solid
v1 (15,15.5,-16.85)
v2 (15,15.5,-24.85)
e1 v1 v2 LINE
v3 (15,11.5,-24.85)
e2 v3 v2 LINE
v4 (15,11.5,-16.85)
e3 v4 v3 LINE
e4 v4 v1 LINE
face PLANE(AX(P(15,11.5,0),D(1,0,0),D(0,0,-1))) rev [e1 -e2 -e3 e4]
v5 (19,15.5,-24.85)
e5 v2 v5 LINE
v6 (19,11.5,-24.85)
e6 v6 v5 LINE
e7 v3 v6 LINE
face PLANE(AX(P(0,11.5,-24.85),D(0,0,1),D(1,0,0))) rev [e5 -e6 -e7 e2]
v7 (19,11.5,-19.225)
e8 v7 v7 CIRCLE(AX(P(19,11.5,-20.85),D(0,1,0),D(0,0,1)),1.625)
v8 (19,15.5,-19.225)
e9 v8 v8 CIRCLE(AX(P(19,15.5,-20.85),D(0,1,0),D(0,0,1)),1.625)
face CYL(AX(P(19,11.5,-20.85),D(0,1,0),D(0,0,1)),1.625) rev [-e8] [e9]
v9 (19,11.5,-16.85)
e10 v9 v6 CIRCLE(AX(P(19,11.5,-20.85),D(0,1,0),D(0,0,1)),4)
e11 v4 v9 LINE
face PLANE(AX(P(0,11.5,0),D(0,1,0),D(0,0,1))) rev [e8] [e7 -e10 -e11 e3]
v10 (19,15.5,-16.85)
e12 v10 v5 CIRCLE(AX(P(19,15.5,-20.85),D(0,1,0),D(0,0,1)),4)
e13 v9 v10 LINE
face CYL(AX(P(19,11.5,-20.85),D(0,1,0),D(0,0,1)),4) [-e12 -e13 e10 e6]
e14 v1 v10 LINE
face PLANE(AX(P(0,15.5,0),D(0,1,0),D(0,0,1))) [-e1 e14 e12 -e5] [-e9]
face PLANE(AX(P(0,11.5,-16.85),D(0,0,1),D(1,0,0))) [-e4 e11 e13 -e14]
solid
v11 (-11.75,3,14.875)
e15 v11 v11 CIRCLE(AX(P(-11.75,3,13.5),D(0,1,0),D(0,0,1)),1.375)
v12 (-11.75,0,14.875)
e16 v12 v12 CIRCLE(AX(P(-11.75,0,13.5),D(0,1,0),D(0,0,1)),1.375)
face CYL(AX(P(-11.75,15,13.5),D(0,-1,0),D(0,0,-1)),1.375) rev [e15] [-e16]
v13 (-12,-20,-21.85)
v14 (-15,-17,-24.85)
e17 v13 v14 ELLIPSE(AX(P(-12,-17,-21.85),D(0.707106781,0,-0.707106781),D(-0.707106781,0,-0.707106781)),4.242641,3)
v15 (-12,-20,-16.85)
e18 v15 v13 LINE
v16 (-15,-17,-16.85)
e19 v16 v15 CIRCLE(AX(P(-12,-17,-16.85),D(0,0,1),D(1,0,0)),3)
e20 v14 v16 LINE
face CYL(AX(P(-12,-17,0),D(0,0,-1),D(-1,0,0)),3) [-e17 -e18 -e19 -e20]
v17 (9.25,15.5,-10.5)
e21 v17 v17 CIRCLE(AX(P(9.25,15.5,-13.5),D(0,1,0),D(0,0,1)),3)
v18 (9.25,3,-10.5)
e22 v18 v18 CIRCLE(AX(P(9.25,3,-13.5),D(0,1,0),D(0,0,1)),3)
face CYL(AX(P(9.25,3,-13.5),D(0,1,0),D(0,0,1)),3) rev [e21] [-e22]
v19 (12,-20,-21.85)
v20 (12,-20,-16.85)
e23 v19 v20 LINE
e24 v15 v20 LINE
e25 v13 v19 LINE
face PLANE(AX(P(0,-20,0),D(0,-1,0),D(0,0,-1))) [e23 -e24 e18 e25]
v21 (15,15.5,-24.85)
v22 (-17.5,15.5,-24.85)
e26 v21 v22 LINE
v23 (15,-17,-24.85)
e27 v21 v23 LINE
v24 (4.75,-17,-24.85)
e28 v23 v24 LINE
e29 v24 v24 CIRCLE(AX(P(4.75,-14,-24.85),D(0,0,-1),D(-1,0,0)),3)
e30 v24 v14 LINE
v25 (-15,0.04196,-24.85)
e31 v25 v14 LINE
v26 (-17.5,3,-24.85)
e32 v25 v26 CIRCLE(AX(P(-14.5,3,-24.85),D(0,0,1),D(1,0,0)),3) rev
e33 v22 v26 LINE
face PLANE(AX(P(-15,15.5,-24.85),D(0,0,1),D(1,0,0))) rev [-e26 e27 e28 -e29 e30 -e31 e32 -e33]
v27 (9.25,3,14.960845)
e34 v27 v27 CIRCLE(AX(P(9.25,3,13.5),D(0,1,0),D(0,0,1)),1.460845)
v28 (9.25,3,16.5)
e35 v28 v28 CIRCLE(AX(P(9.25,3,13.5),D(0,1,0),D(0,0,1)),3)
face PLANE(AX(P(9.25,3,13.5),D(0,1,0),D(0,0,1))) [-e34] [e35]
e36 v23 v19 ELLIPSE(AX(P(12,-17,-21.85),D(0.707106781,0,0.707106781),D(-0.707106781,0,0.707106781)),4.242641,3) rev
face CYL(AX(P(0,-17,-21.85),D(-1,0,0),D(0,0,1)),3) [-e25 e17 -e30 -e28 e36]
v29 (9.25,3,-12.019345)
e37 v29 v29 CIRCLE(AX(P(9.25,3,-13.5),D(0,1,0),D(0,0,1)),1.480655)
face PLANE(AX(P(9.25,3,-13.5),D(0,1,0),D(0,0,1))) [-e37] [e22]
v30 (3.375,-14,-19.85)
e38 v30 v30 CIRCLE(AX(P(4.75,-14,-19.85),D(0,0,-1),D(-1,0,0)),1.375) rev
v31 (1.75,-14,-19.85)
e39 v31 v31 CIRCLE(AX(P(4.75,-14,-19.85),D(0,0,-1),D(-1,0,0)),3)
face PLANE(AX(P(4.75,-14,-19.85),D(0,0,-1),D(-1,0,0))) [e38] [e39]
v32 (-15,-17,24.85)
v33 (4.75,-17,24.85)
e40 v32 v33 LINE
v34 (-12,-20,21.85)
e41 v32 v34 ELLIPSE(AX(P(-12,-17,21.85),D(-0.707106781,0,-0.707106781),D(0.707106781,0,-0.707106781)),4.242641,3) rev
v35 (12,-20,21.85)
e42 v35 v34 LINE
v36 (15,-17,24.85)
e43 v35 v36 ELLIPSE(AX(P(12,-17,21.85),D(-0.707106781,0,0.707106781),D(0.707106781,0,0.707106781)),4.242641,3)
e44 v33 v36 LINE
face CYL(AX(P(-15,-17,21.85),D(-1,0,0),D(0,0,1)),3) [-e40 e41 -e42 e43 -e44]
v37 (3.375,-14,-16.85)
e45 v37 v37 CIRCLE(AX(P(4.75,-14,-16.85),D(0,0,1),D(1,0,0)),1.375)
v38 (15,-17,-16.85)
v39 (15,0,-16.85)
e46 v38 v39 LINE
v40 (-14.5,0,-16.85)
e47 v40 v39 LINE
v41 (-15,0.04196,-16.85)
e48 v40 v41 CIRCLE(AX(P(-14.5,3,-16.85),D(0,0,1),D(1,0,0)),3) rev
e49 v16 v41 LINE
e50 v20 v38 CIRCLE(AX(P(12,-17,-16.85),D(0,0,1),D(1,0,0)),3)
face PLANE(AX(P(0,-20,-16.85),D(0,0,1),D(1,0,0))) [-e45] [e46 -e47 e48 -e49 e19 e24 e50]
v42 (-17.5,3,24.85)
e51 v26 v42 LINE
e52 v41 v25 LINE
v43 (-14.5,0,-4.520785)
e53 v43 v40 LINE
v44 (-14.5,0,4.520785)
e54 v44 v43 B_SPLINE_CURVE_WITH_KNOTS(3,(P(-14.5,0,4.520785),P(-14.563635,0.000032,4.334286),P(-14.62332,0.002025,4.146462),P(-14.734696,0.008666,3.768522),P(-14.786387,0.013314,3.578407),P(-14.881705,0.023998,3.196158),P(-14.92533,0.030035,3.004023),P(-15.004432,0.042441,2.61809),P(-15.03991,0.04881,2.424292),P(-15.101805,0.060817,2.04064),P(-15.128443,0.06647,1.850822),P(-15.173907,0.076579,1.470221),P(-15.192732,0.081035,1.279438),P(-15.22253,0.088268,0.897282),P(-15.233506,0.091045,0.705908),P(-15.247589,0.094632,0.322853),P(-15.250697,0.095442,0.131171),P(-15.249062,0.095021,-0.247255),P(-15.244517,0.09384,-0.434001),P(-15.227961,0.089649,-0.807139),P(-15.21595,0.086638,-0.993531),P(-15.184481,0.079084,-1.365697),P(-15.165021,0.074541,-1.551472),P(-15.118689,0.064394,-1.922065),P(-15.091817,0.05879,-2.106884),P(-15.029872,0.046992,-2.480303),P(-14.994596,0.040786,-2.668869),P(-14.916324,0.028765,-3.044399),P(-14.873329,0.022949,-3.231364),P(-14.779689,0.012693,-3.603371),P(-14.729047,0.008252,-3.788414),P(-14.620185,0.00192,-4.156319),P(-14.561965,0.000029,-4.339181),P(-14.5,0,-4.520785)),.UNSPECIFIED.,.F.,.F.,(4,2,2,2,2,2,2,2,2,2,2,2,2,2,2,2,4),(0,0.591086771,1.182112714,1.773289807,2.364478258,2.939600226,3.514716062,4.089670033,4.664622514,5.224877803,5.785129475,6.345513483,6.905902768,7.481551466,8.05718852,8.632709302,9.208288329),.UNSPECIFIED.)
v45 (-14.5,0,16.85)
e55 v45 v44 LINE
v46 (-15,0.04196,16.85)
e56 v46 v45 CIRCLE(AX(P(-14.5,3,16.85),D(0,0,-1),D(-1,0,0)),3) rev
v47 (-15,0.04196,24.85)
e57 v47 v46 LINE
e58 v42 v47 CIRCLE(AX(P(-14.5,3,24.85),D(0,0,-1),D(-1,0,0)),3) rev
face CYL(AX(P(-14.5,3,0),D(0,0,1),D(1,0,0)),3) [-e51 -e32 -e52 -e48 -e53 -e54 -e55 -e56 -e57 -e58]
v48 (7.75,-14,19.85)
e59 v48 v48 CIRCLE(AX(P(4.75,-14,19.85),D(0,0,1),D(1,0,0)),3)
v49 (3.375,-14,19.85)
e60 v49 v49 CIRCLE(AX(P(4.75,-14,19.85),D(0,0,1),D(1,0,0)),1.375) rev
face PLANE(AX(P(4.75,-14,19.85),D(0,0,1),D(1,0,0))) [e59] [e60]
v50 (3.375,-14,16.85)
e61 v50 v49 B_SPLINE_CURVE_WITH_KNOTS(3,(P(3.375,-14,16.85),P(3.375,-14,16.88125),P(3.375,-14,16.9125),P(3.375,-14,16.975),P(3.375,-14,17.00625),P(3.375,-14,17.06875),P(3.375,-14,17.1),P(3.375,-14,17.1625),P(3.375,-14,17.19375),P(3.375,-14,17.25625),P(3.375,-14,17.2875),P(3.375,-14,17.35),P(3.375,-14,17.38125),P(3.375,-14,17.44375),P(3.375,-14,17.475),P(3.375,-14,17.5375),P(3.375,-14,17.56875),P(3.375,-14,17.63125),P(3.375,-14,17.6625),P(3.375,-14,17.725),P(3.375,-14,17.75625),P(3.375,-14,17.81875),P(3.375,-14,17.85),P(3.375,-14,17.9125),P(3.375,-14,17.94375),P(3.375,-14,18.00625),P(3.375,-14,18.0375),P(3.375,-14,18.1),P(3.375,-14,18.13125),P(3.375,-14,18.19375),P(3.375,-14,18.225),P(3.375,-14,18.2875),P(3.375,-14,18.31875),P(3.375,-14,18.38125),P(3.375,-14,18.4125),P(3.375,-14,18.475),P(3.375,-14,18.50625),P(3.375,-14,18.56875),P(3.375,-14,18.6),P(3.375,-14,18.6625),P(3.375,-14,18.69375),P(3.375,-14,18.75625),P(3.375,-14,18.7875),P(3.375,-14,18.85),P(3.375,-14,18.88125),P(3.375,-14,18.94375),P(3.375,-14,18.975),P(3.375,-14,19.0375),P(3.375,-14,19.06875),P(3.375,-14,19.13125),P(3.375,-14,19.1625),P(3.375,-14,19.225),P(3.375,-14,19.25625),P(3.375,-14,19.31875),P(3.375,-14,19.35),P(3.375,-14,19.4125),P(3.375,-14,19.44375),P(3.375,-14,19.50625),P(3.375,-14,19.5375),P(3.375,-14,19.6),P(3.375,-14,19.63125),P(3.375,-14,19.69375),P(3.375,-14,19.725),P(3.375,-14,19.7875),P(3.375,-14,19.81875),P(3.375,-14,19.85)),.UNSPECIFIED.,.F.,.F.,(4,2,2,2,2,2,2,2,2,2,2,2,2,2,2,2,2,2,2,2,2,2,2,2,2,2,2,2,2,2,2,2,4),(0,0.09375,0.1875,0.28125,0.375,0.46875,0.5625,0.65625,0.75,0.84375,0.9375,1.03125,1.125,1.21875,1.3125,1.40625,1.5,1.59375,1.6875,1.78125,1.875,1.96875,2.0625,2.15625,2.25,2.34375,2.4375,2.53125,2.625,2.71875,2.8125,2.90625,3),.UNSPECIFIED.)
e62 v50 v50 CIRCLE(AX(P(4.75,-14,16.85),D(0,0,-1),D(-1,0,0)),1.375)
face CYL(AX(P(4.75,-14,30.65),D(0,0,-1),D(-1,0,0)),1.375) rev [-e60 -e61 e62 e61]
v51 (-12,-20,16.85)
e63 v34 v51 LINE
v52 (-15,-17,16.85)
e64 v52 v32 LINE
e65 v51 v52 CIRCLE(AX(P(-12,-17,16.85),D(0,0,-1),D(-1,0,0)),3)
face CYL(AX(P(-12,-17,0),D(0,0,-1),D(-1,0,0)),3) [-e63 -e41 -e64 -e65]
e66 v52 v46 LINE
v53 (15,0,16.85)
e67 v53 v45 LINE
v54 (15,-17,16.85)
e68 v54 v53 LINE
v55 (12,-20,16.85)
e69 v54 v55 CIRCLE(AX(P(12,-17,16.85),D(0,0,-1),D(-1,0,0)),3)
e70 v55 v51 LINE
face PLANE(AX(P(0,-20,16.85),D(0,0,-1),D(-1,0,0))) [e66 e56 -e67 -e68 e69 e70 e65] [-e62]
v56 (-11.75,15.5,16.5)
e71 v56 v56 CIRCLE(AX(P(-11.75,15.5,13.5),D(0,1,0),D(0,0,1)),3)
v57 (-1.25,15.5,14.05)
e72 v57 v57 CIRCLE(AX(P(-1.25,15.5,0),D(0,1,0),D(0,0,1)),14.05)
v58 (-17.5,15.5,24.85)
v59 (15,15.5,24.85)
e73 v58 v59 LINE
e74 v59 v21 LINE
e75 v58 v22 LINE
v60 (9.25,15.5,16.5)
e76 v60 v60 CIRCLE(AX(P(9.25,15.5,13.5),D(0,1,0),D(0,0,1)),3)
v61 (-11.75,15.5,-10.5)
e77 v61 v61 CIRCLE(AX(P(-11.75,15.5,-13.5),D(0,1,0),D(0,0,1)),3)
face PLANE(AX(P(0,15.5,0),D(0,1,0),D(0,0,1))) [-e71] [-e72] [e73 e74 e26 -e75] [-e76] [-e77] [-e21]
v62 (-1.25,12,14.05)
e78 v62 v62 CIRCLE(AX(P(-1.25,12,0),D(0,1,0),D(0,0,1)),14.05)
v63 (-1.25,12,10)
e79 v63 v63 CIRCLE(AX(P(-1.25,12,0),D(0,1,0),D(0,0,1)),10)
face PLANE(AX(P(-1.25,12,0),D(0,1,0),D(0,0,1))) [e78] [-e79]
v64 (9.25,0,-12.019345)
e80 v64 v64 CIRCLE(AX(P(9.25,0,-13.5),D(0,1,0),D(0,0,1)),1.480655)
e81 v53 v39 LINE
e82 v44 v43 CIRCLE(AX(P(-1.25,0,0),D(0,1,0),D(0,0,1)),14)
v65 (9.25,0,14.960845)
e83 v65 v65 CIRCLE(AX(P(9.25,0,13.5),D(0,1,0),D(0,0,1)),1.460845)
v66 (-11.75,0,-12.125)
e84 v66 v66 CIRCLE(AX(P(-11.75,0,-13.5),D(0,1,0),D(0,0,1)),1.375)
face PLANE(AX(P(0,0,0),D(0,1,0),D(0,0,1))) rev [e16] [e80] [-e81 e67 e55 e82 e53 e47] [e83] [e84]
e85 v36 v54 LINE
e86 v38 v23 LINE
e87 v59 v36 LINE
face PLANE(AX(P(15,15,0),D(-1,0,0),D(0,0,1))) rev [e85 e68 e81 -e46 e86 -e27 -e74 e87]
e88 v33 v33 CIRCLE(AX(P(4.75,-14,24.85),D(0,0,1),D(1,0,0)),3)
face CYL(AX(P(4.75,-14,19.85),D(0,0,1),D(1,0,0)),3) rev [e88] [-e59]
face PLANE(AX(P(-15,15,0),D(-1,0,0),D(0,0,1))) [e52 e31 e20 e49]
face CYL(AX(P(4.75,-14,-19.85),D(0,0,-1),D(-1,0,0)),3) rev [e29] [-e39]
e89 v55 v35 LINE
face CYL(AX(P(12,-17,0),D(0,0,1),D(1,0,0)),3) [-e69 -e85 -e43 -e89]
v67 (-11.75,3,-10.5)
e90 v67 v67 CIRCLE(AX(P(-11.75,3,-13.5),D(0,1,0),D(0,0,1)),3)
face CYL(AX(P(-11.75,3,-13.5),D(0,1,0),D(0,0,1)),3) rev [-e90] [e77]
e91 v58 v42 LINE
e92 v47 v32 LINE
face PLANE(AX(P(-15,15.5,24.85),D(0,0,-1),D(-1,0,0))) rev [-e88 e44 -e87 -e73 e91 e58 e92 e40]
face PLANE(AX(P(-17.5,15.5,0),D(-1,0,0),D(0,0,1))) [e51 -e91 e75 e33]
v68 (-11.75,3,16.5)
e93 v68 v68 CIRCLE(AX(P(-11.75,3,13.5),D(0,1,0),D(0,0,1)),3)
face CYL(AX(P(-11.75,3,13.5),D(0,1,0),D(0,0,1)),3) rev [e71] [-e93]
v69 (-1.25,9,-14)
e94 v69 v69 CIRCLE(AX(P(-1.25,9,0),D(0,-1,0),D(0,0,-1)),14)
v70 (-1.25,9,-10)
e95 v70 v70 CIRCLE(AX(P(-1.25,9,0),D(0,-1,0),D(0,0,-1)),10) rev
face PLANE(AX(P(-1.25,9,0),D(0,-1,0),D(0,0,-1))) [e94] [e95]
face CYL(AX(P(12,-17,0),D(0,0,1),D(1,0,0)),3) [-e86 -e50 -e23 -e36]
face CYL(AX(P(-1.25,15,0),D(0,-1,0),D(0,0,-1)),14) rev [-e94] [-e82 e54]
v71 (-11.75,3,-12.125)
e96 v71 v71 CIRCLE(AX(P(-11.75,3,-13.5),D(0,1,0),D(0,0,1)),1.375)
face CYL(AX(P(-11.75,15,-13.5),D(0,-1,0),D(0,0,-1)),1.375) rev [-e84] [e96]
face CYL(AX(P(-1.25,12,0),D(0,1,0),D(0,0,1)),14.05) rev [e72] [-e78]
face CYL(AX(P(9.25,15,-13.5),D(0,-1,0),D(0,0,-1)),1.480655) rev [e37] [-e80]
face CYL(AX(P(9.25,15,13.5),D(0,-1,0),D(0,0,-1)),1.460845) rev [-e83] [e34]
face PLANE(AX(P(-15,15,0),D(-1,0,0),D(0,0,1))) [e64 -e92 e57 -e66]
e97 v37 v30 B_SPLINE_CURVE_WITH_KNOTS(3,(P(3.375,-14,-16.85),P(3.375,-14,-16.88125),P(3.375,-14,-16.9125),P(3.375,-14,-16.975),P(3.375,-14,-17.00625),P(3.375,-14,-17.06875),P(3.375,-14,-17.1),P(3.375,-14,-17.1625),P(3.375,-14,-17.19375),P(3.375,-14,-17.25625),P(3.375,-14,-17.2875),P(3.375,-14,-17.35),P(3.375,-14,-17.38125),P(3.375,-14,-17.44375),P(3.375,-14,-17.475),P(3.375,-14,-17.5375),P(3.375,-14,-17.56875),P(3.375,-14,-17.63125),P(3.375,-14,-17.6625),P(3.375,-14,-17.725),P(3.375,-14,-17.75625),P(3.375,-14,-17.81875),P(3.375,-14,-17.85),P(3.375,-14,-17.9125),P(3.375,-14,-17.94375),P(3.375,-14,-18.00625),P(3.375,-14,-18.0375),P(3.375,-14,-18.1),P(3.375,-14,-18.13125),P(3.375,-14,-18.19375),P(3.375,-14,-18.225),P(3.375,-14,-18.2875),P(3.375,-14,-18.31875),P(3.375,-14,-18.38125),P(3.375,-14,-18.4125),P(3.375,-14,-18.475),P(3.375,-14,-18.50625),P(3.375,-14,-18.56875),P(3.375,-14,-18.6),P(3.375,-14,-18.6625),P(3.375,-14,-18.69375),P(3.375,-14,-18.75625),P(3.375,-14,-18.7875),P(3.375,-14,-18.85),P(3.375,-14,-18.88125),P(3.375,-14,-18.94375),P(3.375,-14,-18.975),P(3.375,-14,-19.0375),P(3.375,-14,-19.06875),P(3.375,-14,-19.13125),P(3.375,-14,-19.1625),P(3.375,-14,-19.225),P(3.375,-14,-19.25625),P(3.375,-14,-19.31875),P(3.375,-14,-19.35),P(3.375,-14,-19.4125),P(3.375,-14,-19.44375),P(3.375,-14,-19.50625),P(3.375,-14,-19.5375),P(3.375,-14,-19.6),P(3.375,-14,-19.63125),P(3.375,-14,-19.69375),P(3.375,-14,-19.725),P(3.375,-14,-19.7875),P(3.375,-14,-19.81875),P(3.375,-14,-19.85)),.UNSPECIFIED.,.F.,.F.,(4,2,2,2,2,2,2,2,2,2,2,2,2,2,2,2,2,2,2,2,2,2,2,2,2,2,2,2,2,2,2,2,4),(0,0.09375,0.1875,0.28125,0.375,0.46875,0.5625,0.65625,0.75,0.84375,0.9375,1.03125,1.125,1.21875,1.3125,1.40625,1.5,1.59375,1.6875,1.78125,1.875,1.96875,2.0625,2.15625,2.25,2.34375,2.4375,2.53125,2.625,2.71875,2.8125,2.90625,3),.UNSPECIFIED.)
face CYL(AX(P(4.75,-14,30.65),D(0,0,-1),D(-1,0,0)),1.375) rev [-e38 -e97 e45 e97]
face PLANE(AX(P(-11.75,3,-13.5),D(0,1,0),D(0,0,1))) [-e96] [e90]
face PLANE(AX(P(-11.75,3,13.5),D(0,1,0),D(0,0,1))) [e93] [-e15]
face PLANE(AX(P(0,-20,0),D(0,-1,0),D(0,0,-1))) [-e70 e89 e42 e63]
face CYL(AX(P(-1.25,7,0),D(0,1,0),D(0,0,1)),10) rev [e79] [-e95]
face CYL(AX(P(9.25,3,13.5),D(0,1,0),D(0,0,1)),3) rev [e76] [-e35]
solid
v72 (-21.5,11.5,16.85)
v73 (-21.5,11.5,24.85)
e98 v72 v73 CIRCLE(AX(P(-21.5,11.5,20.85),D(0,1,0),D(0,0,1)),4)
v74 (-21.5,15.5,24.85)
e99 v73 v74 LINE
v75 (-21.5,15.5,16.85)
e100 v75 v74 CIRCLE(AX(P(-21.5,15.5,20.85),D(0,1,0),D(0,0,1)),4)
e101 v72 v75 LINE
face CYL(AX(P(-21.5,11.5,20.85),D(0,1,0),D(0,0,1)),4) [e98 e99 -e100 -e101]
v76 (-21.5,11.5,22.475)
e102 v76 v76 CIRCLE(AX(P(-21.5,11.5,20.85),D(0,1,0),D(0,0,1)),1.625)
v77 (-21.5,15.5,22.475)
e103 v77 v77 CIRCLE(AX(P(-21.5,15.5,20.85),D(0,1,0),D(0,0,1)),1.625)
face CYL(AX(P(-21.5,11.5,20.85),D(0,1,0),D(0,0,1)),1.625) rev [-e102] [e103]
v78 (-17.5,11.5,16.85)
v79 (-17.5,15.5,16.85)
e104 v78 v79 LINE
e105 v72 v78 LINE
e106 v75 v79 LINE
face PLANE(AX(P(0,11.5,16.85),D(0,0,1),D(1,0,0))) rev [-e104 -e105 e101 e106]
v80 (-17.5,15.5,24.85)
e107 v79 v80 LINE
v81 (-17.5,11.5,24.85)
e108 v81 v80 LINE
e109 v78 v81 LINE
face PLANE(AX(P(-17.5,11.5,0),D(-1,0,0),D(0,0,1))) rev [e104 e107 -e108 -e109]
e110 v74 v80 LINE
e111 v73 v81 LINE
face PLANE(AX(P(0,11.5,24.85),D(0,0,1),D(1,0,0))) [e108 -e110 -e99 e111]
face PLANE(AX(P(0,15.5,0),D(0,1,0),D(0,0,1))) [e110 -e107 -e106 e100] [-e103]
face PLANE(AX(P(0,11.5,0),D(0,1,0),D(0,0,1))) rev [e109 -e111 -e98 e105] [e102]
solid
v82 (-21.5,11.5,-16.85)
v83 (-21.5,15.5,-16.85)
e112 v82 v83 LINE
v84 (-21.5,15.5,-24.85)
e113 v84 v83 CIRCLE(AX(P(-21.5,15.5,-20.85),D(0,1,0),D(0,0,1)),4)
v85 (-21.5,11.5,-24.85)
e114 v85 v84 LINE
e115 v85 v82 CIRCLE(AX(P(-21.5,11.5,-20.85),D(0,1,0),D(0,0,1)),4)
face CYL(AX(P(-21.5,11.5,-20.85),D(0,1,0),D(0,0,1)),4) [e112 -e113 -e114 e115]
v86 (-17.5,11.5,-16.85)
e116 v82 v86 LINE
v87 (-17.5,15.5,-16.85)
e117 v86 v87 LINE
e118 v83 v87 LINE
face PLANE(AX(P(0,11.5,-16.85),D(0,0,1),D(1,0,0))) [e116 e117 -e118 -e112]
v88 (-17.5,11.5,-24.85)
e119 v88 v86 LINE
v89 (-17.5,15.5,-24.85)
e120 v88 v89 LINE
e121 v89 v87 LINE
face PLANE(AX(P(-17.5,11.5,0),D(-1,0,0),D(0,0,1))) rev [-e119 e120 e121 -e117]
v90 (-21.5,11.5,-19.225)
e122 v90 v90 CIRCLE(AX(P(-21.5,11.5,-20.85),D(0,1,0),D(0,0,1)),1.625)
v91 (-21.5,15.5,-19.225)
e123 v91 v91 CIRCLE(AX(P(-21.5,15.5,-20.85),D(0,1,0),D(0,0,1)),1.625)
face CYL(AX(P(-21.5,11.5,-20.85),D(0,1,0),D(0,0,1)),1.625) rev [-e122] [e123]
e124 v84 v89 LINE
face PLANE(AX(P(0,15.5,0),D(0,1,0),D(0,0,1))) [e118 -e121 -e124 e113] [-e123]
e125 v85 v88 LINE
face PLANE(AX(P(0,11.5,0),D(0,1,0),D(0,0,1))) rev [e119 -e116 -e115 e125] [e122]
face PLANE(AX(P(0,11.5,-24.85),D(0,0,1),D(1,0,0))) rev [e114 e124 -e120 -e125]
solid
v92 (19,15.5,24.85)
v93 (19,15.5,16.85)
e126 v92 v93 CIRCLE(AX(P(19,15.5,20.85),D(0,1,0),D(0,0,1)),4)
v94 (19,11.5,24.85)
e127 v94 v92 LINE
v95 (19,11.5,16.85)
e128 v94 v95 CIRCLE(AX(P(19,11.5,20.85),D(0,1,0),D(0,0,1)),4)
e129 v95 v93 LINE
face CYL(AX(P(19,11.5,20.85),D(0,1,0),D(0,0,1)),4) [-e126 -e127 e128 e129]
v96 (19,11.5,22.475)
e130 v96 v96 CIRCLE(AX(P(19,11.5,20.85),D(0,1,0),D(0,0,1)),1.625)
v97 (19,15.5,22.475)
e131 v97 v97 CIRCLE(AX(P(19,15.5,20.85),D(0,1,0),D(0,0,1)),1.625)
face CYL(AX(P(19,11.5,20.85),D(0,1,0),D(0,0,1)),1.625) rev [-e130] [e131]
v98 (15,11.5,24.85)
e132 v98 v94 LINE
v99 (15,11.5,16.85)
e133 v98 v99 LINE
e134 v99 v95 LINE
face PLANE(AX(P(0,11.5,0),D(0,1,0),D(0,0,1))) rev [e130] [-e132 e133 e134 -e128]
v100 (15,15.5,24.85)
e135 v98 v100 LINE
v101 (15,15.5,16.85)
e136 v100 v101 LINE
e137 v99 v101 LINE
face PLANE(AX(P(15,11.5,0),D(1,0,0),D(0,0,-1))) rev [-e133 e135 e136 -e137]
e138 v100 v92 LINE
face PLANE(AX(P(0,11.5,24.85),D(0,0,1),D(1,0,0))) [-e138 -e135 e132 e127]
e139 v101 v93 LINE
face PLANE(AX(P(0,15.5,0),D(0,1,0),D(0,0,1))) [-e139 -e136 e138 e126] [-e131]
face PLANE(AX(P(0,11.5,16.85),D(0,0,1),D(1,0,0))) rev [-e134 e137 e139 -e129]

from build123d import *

# Parameters (mm, degrees)
SKETCH1_R             = 1.375
SKETCH1_R_2           = 1.460845326
SKETCH1_R_3           = 1.480655282
BOSS_EXTRUDE1_DEPTH   = 15
BOSS_EXTRUDE2_START   = -8
SKETCH2_R             = 14
SKETCH2_R_2           = 10
BOSS_EXTRUDE2_DEPTH   = 8
CUT_EXTRUDE1_START    = -3
SKETCH3_R             = 14
SKETCH3_R_2           = 10
CUT_EXTRUDE1_DEPTH    = 3
SKETCH5_R             = 1.480655282
SKETCH5_R_2           = 1.375
SKETCH5_R_3           = 1.460845326
BOSS_EXTRUDE3_DEPTH   = 0.5
BOSS_EXTRUDE4_DEPTH   = 5
SKETCH7_R             = 3
CUT_EXTRUDE2_DEPTH    = 12.5
SKETCH8_R             = 14.05
CUT_EXTRUDE3_DEPTH    = 3.5
SKETCH9_W             = 30
SKETCH9_H             = 8
BOSS_EXTRUDE6_DEPTH   = 20
BOSS_EXTRUDE6_2_DEPTH = 20
SKETCH10_W            = 30
SKETCH10_H            = 8
BOSS_EXTRUDE7_DEPTH   = 15.5
BOSS_EXTRUDE14_DEPTH  = 15.5
CUT_EXTRUDE11_START   = 15.5
SKETCH16_R            = 14.05
CUT_EXTRUDE11_DEPTH   = 15.5
SKETCH17_R            = 4
SKETCH17_R_2          = 1.625
BOSS_EXTRUDE15_DEPTH  = 4
SKETCH18_R            = 1.375
CUT_EXTRUDE12_DEPTH   = 55.5
SKETCH19_R            = 3
CUT_EXTRUDE13_DEPTH   = 5
CUT_EXTRUDE14_START   = -5
SKETCH20_R            = 3
CUT_EXTRUDE14_DEPTH   = 5
FILLET1_R             = 3
FILLET2_R             = 3
SKETCH21_R            = 14
CUT_EXTRUDE15_DEPTH   = 2


# Some blends are built 0.0001 mm under size
with BuildPart() as part:
    # Sketch1 → Boss-Extrude1 (new body)
    with BuildSketch(Plane(origin=(0, 0, 0), x_dir=(1, 0, 0), z_dir=(0, 1, 0))):
        with BuildLine():
            Line((-15, -16.85), (15, -16.85))
            Line((15, -16.85), (15, 16.85))
            Line((15, 16.85), (-15, 16.85))
            Line((-15, 16.85), (-15, 2.633913438))
            ThreePointArc((-15, 2.633913438), (0.072875656, 13.937359865), (12.75, 0))
            ThreePointArc((12.75, 0), (0.072875656, -13.937359865), (-15, -2.633913438))
            Line((-15, -2.633913438), (-15, -16.85))
        make_face()
        with Locations(Location((-11.75, -13.5, 0), (0, 0, 270))):
            Circle(SKETCH1_R, mode=Mode.SUBTRACT)
        with Locations(Location((9.25, -13.5, 0), (0, 0, 270))):
            Circle(SKETCH1_R_2, mode=Mode.SUBTRACT)
        with Locations(Location((-11.75, 13.5, 0), (0, 0, 270))):
            Circle(SKETCH1_R, mode=Mode.SUBTRACT)
        with Locations(Location((9.25, 13.5, 0), (0, 0, 270))):
            Circle(SKETCH1_R_3, mode=Mode.SUBTRACT)
    extrude(amount=BOSS_EXTRUDE1_DEPTH)

    # Sketch2 → Boss-Extrude2 (add)
    with BuildSketch(Plane(origin=(0, 15, 0), x_dir=(1, 0, 0), z_dir=(0, 1, 0)).offset(BOSS_EXTRUDE2_START)):
        with Locations((-1.25, 0)):
            Circle(SKETCH2_R)
        with Locations(Location((-1.25, 0, 0), (0, 0, 270))):
            Circle(SKETCH2_R_2, mode=Mode.SUBTRACT)
    extrude(amount=BOSS_EXTRUDE2_DEPTH)

    # Sketch3 → Cut-Extrude1 (cut)
    with BuildSketch(Plane(origin=(0, 15, 0), x_dir=(1, 0, 0), z_dir=(0, 1, 0)).offset(CUT_EXTRUDE1_START)):
        with Locations((-1.25, 0)):
            Circle(SKETCH3_R)
        with Locations(Location((-1.25, 0, 0), (0, 0, 270))):
            Circle(SKETCH3_R_2, mode=Mode.SUBTRACT)
    extrude(amount=CUT_EXTRUDE1_DEPTH, mode=Mode.SUBTRACT)

    # Sketch5 → Boss-Extrude3 (add)
    with BuildSketch(Plane(origin=(0, 15, 0), x_dir=(1, 0, 0), z_dir=(0, 1, 0))):
        with BuildLine():
            Line((-15, 16.85), (-15, 2.633913438))
            ThreePointArc((-15, 2.633913438), (12.75, 0), (-15, -2.633913438))
            Line((-15, -2.633913438), (-15, -16.85))
            Line((-15, -16.85), (15, -16.85))
            Line((15, -16.85), (15, 16.85))
            Line((15, 16.85), (-15, 16.85))
        make_face()
        with Locations(Location((9.25, 13.5, 0), (0, 0, 270))):
            Circle(SKETCH5_R, mode=Mode.SUBTRACT)
        with Locations(Location((-11.75, -13.5, 0), (0, 0, 270))):
            Circle(SKETCH5_R_2, mode=Mode.SUBTRACT)
        with Locations(Location((-11.75, 13.5, 0), (0, 0, 270))):
            Circle(SKETCH5_R_2, mode=Mode.SUBTRACT)
        with Locations(Location((9.25, -13.5, 0), (0, 0, 270))):
            Circle(SKETCH5_R_3, mode=Mode.SUBTRACT)
    extrude(amount=BOSS_EXTRUDE3_DEPTH)

    # Sketch6 → Boss-Extrude4 (add)
    with BuildSketch(Plane(origin=(0, 15.5, 0), x_dir=(1, 0, 0), z_dir=(0, 1, 0))):
        with BuildLine():
            ThreePointArc((-1.625, 20.35), (0, 21.975), (1.625, 20.35))
            Line((1.625, 20.35), (3.5, 20.35))
            ThreePointArc((3.5, 20.35), (0, 23.85), (-3.5, 20.35))
            Line((-3.5, 20.35), (-1.625, 20.35))
        make_face()
        with BuildLine():
            Line((3.5, 20.35), (1.625, 20.35))
            ThreePointArc((1.625, 20.35), (0, 18.725), (-1.625, 20.35))
            Line((-1.625, 20.35), (-3.5, 20.35))
            ThreePointArc((-3.5, 20.35), (-2.474873743, 17.875126275), (-2.6e-08, 16.85))
            ThreePointArc((-2.6e-08, 16.85), (2.474873725, 17.875126257), (3.5, 20.35))
        make_face()
        with BuildLine():
            Line((3.5, 16.85), (3.5, 20.35))
            ThreePointArc((3.5, 20.35), (2.474873725, 17.875126257), (-2.6e-08, 16.85))
            Line((-2.6e-08, 16.85), (3.5, 16.85))
        make_face()
        with BuildLine():
            ThreePointArc((-2.6e-08, 16.85), (-2.474873743, 17.875126275), (-3.5, 20.35))
            Line((-3.5, 20.35), (-3.5, 16.85))
            Line((-3.5, 16.85), (-2.6e-08, 16.85))
        make_face()
        with BuildLine():
            ThreePointArc((-3.5, -20.35), (-2.474873734, -17.875126266), (0, -16.85))
            Line((0, -16.85), (-3.5, -16.85))
            Line((-3.5, -16.85), (-3.5, -20.35))
        make_face()
        with BuildLine():
            Line((3.5, -20.35), (3.5, -16.85))
            Line((3.5, -16.85), (0, -16.85))
            ThreePointArc((0, -16.85), (2.474873734, -17.875126266), (3.5, -20.35))
        make_face()
        with BuildLine():
            ThreePointArc((-3.5, -20.35), (0, -23.85), (3.5, -20.35))
            Line((3.5, -20.35), (1.625, -20.35))
            ThreePointArc((1.625, -20.35), (0, -21.975), (-1.625, -20.35))
            Line((-1.625, -20.35), (-3.5, -20.35))
        make_face()
        with BuildLine():
            Line((1.625, -20.35), (3.5, -20.35))
            ThreePointArc((3.5, -20.35), (2.474873734, -17.875126266), (0, -16.85))
            ThreePointArc((0, -16.85), (-2.474873734, -17.875126266), (-3.5, -20.35))
            Line((-3.5, -20.35), (-1.625, -20.35))
            ThreePointArc((-1.625, -20.35), (0, -18.725), (1.625, -20.35))
        make_face()
    extrude(amount=-BOSS_EXTRUDE4_DEPTH)

    # Sketch7 → Cut-Extrude2 (cut)
    with BuildSketch(Plane(origin=(0, 15.5, 0), x_dir=(1, 0, 0), z_dir=(0, 1, 0))):
        with Locations(Location((-11.75, 13.5, 0), (0, 0, 270))):
            Circle(SKETCH7_R)
        with Locations(Location((9.25, 13.5, 0), (0, 0, 270))):
            Circle(SKETCH7_R)
        with Locations(Location((9.25, -13.5, 0), (0, 0, 270))):
            Circle(SKETCH7_R)
        with Locations(Location((-11.75, -13.5, 0), (0, 0, 270))):
            Circle(SKETCH7_R)
    extrude(amount=-CUT_EXTRUDE2_DEPTH, mode=Mode.SUBTRACT)

    # Sketch8 → Cut-Extrude3 (cut)
    with BuildSketch(Plane(origin=(0, 15.5, 0), x_dir=(1, 0, 0), z_dir=(0, 1, 0))):
        with Locations((-1.25, 0)):
            Circle(SKETCH8_R)
    extrude(amount=-CUT_EXTRUDE3_DEPTH, mode=Mode.SUBTRACT)



with BuildPart() as body_2:
    # Sketch9 → Boss-Extrude6 (new body)
    with BuildSketch(Plane.XZ):
        with Locations((0, 20.85)):
            Rectangle(SKETCH9_W, SKETCH9_H)
    extrude(amount=BOSS_EXTRUDE6_DEPTH)


with BuildPart() as body_3:
    # Sketch9 → Boss-Extrude6 2 (new body)
    with BuildSketch(Plane.XZ):
        with Locations((0, -20.85)):
            Rectangle(SKETCH9_W, SKETCH9_H)
    extrude(amount=BOSS_EXTRUDE6_2_DEPTH)


with BuildPart() as part_1:
    add(part.part)

    add(body_2.part)  # Boss-Extrude7 merges body 2

    add(body_3.part)  # Boss-Extrude7 merges body 3
    # Sketch10 → Boss-Extrude7 (add)
    with BuildSketch(Plane(origin=(0, 0, 0), x_dir=(1, 0, 0), z_dir=(0, 1, 0))):
        with Locations((0, 20.85)):
            Rectangle(SKETCH10_W, SKETCH10_H)
        with Locations((0, -20.85)):
            Rectangle(SKETCH10_W, SKETCH10_H)
    extrude(amount=BOSS_EXTRUDE7_DEPTH)

    # Sketch15 → Boss-Extrude14 (add)
    with BuildSketch(Plane.XZ):
        with BuildLine():
            Line((-15, 24.85), (-17.5, 24.85))
            Line((-17.5, 24.85), (-17.5, -24.85))
            Line((-17.5, -24.85), (-15, -24.85))
            Line((-15, -24.85), (-15, -16.85))
            Line((-15, -16.85), (-15, -2.633913438))
            ThreePointArc((-15, -2.633913438), (-15.25, 0), (-15, 2.633913438))
            Line((-15, 2.633913438), (-15, 16.85))
            Line((-15, 16.85), (-15, 24.85))
        make_face()
    extrude(amount=-BOSS_EXTRUDE14_DEPTH)

    # Sketch16 → Cut-Extrude11 (cut)
    with BuildSketch(Plane(origin=(0, 12, 0), x_dir=(1, 0, 0), z_dir=(0, 1, 0)).offset(CUT_EXTRUDE11_START)):
        with Locations(Location((-1.25, 0, 0), (0, 0, 270))):
            Circle(SKETCH16_R)
    extrude(amount=-CUT_EXTRUDE11_DEPTH, mode=Mode.SUBTRACT)

    # Sketch18 → Cut-Extrude12 (cut)
    with BuildSketch(Plane(origin=(0, 0, -24.85), x_dir=(-1, 0, 0), z_dir=(0, 0, -1))):
        with Locations((-4.75, -14)):
            Circle(SKETCH18_R)
    extrude(amount=-CUT_EXTRUDE12_DEPTH, mode=Mode.SUBTRACT)

    # Sketch19 → Cut-Extrude13 (cut)
    with BuildSketch(Plane.XY.offset(24.85)):
        with Locations((4.75, -14)):
            Circle(SKETCH19_R)
    extrude(amount=-CUT_EXTRUDE13_DEPTH, mode=Mode.SUBTRACT)

    # Sketch20 → Cut-Extrude14 (cut)
    with BuildSketch(Plane(origin=(0, 0, -24.85), x_dir=(-1, 0, 0), z_dir=(0, 0, -1)).offset(CUT_EXTRUDE14_START)):
        with Locations(Location((-4.75, -14, 0), (0, 0, 180))):
            Circle(SKETCH20_R)
    extrude(amount=CUT_EXTRUDE14_DEPTH, mode=Mode.SUBTRACT)

    # Fillet1
    # the kernel refuses this fillet: 3 mm, written as the material it takes off along each edge
    with BuildSketch(Plane(origin=(-17.5, 0, 32.35), x_dir=(1, 0, 0), z_dir=(0, 0, -1))) as fillet1_piece_1_section:
        with BuildLine():
            CenterArc((FILLET1_R, -FILLET1_R), FILLET1_R, 90, 90)
            Line((0, -FILLET1_R), (0, 0))
            Line((0, 0), (FILLET1_R, 0))
        make_face()
    fillet1_piece_1 = extrude(amount=64.7, mode=Mode.PRIVATE)
    fillet1_piece_1 = split(fillet1_piece_1, bisect_by=Plane(origin=(-15, 0.690666213, 24.6), z_dir=(-1, 0, 0)), keep=Keep.TOP, mode=Mode.PRIVATE)
    fillet1_piece_1 = split(fillet1_piece_1, bisect_by=Plane(origin=(-16.854336026, 0.690666213, 16.85), z_dir=(0, 0, 1)), keep=Keep.TOP, mode=Mode.PRIVATE)
    add(fillet1_piece_1, mode=Mode.SUBTRACT)
    with BuildSketch(Plane(origin=(-17.5, 0, 32.35), x_dir=(1, 0, 0), z_dir=(0, 0, -1))) as fillet1_piece_2_section:
        with BuildLine():
            CenterArc((FILLET1_R, -FILLET1_R), FILLET1_R, 90, 90)
            Line((0, -FILLET1_R), (0, 0))
            Line((0, 0), (FILLET1_R, 0))
        make_face()
    fillet1_piece_2 = extrude(amount=64.7, mode=Mode.PRIVATE)
    fillet1_piece_2 = split(fillet1_piece_2, bisect_by=Plane(origin=(-15, -0.021970268, 0), z_dir=(1, 0, 0)), keep=Keep.TOP, mode=Mode.PRIVATE)
    fillet1_piece_2 = split(fillet1_piece_2, bisect_by=Plane(origin=(-14.773609576, -0.021970268, 16.85), z_dir=(0, 0, -1)), keep=Keep.TOP, mode=Mode.PRIVATE)
    fillet1_piece_2 = split(fillet1_piece_2, bisect_by=Plane(origin=(-14.773609576, -0.021970268, -16.85), z_dir=(0, 0, 1)), keep=Keep.TOP, mode=Mode.PRIVATE)
    add(fillet1_piece_2, mode=Mode.SUBTRACT)
    with BuildSketch(Plane(origin=(-17.5, 0, 32.35), x_dir=(1, 0, 0), z_dir=(0, 0, -1))) as fillet1_piece_3_section:
        with BuildLine():
            CenterArc((FILLET1_R, -FILLET1_R), FILLET1_R, 90, 90)
            Line((0, -FILLET1_R), (0, 0))
            Line((0, 0), (FILLET1_R, 0))
        make_face()
    fillet1_piece_3 = extrude(amount=64.7, mode=Mode.PRIVATE)
    fillet1_piece_3 = split(fillet1_piece_3, bisect_by=Plane(origin=(-15, 0.690666213, 0), z_dir=(-1, 0, 0)), keep=Keep.TOP, mode=Mode.PRIVATE)
    fillet1_piece_3 = split(fillet1_piece_3, bisect_by=Plane(origin=(-16.854336026, 0.690666213, 16.85), z_dir=(0, 0, -1)), keep=Keep.TOP, mode=Mode.PRIVATE)
    fillet1_piece_3 = split(fillet1_piece_3, bisect_by=Plane(origin=(-16.854336026, 0.690666213, -16.85), z_dir=(0, 0, 1)), keep=Keep.TOP, mode=Mode.PRIVATE)
    add(fillet1_piece_3, mode=Mode.SUBTRACT)
    with BuildSketch(Plane(origin=(-17.5, 0, 32.35), x_dir=(1, 0, 0), z_dir=(0, 0, -1))) as fillet1_piece_4_section:
        with BuildLine():
            CenterArc((FILLET1_R, -FILLET1_R), FILLET1_R, 90, 90)
            Line((0, -FILLET1_R), (0, 0))
            Line((0, 0), (FILLET1_R, 0))
        make_face()
    fillet1_piece_4 = extrude(amount=64.7, mode=Mode.PRIVATE)
    fillet1_piece_4 = split(fillet1_piece_4, bisect_by=Plane(origin=(-15, 0.690666213, -24.6), z_dir=(-1, 0, 0)), keep=Keep.TOP, mode=Mode.PRIVATE)
    fillet1_piece_4 = split(fillet1_piece_4, bisect_by=Plane(origin=(-16.854336026, 0.690666213, -16.85), z_dir=(0, 0, -1)), keep=Keep.TOP, mode=Mode.PRIVATE)
    add(fillet1_piece_4, mode=Mode.SUBTRACT)

    # Fillet2
    fillet2_edges = [part_1.edges().sort_by_distance(p)[0] for p in [
        (15, -20, -20.85),
        (-15, -20, -20.85),
        (0, -20, -24.85),
        (15, -20, 20.85),
        (0, -20, 24.85),
        (-15, -20, 20.85),
    ]]
    fillet(fillet2_edges, radius=FILLET2_R - 0.0001)  # a hair under: the kernel refuses the full size

    # Sketch21 → Cut-Extrude15 (cut)
    with BuildSketch(Plane.XZ.offset(-7)):
        with Locations(Location((-1.25, 0, 0), (0, 0, 270))):
            Circle(SKETCH21_R)
    extrude(amount=-CUT_EXTRUDE15_DEPTH, mode=Mode.SUBTRACT)


with BuildPart() as body_2_2:
    # Sketch17 → Boss-Extrude15 (new body)
    # profile 1 of 12: a face of its own
    with BuildSketch(Plane(origin=(0, 15.5, 0), x_dir=(1, 0, 0), z_dir=(0, 1, 0))):
        with Locations((-21.5, 20.85)):
            Circle(SKETCH17_R)
        with Locations(Location((-21.5, 20.85, 0), (0, 0, 270))):
            Circle(SKETCH17_R_2, mode=Mode.SUBTRACT)
    # profile 2 of 12: a face of its own
    with BuildSketch(Plane(origin=(0, 15.5, 0), x_dir=(1, 0, 0), z_dir=(0, 1, 0))):
        with BuildLine():
            Line((-17.5, -20.85), (-17.5, -16.85))
            Line((-17.5, -16.85), (-21.5, -16.85))
            ThreePointArc((-21.5, -16.85), (-18.671572875, -18.021572875), (-17.5, -20.85))
        make_face()
    # profile 3 of 12: a face of its own
    with BuildSketch(Plane(origin=(0, 15.5, 0), x_dir=(1, 0, 0), z_dir=(0, 1, 0))):
        with BuildLine():
            Line((-17.5, -24.85), (-17.5, -20.85))
            ThreePointArc((-17.5, -20.85), (-18.671572875, -23.678427125), (-21.5, -24.85))
            Line((-21.5, -24.85), (-17.5, -24.85))
        make_face()
    # profile 4 of 12: a face of its own
    with BuildSketch(Plane(origin=(0, 15.5, 0), x_dir=(1, 0, 0), z_dir=(0, 1, 0))):
        with Locations((-21.5, -20.85)):
            Circle(SKETCH17_R)
        with Locations(Location((-21.5, -20.85, 0), (0, 0, 270))):
            Circle(SKETCH17_R_2, mode=Mode.SUBTRACT)
    # profile 5 of 12: a face of its own
    with BuildSketch(Plane(origin=(0, 15.5, 0), x_dir=(1, 0, 0), z_dir=(0, 1, 0))):
        with BuildLine():
            Line((19, -16.85), (15, -16.85))
            Line((15, -16.85), (15, -20.85))
            ThreePointArc((15, -20.85), (16.171572875, -18.021572875), (19, -16.85))
        make_face()
    # profile 6 of 12: a face of its own
    with BuildSketch(Plane(origin=(0, 15.5, 0), x_dir=(1, 0, 0), z_dir=(0, 1, 0))):
        with Locations((19, -20.85)):
            Circle(SKETCH17_R)
        with Locations(Location((19, -20.85, 0), (0, 0, 270))):
            Circle(SKETCH17_R_2, mode=Mode.SUBTRACT)
    # profile 7 of 12: a face of its own
    with BuildSketch(Plane(origin=(0, 15.5, 0), x_dir=(1, 0, 0), z_dir=(0, 1, 0))):
        with BuildLine():
            ThreePointArc((19, -24.85), (16.171572875, -23.678427125), (15, -20.85))
            Line((15, -20.85), (15, -24.85))
            Line((15, -24.85), (19, -24.85))
        make_face()
    # profile 8 of 12: a face of its own
    with BuildSketch(Plane(origin=(0, 15.5, 0), x_dir=(1, 0, 0), z_dir=(0, 1, 0))):
        with Locations((19, 20.85)):
            Circle(SKETCH17_R)
        with Locations(Location((19, 20.85, 0), (0, 0, 270))):
            Circle(SKETCH17_R_2, mode=Mode.SUBTRACT)
    # profile 9 of 12: a face of its own
    with BuildSketch(Plane(origin=(0, 15.5, 0), x_dir=(1, 0, 0), z_dir=(0, 1, 0))):
        with BuildLine():
            Line((19, 24.85), (15, 24.85))
            Line((15, 24.85), (15, 20.85))
            ThreePointArc((15, 20.85), (16.171572875, 23.678427125), (19, 24.85))
        make_face()
    # profile 10 of 12: a face of its own
    with BuildSketch(Plane(origin=(0, 15.5, 0), x_dir=(1, 0, 0), z_dir=(0, 1, 0))):
        with BuildLine():
            ThreePointArc((19, 16.85), (16.171572875, 18.021572875), (15, 20.85))
            Line((15, 20.85), (15, 16.85))
            Line((15, 16.85), (19, 16.85))
        make_face()
    # profile 11 of 12: a face of its own
    with BuildSketch(Plane(origin=(0, 15.5, 0), x_dir=(1, 0, 0), z_dir=(0, 1, 0))):
        with BuildLine():
            Line((-17.5, 16.85), (-17.5, 20.85))
            ThreePointArc((-17.5, 20.85), (-18.671572875, 18.021572875), (-21.5, 16.85))
            Line((-21.5, 16.85), (-17.5, 16.85))
        make_face()
    # profile 12 of 12: a face of its own
    with BuildSketch(Plane(origin=(0, 15.5, 0), x_dir=(1, 0, 0), z_dir=(0, 1, 0))):
        with BuildLine():
            Line((-17.5, 24.85), (-21.5, 24.85))
            ThreePointArc((-21.5, 24.85), (-18.671572875, 23.678427125), (-17.5, 20.85))
            Line((-17.5, 20.85), (-17.5, 24.85))
        make_face()
    extrude(amount=-BOSS_EXTRUDE15_DEPTH)


solid = Compound([part_1.part, body_2_2.part])
